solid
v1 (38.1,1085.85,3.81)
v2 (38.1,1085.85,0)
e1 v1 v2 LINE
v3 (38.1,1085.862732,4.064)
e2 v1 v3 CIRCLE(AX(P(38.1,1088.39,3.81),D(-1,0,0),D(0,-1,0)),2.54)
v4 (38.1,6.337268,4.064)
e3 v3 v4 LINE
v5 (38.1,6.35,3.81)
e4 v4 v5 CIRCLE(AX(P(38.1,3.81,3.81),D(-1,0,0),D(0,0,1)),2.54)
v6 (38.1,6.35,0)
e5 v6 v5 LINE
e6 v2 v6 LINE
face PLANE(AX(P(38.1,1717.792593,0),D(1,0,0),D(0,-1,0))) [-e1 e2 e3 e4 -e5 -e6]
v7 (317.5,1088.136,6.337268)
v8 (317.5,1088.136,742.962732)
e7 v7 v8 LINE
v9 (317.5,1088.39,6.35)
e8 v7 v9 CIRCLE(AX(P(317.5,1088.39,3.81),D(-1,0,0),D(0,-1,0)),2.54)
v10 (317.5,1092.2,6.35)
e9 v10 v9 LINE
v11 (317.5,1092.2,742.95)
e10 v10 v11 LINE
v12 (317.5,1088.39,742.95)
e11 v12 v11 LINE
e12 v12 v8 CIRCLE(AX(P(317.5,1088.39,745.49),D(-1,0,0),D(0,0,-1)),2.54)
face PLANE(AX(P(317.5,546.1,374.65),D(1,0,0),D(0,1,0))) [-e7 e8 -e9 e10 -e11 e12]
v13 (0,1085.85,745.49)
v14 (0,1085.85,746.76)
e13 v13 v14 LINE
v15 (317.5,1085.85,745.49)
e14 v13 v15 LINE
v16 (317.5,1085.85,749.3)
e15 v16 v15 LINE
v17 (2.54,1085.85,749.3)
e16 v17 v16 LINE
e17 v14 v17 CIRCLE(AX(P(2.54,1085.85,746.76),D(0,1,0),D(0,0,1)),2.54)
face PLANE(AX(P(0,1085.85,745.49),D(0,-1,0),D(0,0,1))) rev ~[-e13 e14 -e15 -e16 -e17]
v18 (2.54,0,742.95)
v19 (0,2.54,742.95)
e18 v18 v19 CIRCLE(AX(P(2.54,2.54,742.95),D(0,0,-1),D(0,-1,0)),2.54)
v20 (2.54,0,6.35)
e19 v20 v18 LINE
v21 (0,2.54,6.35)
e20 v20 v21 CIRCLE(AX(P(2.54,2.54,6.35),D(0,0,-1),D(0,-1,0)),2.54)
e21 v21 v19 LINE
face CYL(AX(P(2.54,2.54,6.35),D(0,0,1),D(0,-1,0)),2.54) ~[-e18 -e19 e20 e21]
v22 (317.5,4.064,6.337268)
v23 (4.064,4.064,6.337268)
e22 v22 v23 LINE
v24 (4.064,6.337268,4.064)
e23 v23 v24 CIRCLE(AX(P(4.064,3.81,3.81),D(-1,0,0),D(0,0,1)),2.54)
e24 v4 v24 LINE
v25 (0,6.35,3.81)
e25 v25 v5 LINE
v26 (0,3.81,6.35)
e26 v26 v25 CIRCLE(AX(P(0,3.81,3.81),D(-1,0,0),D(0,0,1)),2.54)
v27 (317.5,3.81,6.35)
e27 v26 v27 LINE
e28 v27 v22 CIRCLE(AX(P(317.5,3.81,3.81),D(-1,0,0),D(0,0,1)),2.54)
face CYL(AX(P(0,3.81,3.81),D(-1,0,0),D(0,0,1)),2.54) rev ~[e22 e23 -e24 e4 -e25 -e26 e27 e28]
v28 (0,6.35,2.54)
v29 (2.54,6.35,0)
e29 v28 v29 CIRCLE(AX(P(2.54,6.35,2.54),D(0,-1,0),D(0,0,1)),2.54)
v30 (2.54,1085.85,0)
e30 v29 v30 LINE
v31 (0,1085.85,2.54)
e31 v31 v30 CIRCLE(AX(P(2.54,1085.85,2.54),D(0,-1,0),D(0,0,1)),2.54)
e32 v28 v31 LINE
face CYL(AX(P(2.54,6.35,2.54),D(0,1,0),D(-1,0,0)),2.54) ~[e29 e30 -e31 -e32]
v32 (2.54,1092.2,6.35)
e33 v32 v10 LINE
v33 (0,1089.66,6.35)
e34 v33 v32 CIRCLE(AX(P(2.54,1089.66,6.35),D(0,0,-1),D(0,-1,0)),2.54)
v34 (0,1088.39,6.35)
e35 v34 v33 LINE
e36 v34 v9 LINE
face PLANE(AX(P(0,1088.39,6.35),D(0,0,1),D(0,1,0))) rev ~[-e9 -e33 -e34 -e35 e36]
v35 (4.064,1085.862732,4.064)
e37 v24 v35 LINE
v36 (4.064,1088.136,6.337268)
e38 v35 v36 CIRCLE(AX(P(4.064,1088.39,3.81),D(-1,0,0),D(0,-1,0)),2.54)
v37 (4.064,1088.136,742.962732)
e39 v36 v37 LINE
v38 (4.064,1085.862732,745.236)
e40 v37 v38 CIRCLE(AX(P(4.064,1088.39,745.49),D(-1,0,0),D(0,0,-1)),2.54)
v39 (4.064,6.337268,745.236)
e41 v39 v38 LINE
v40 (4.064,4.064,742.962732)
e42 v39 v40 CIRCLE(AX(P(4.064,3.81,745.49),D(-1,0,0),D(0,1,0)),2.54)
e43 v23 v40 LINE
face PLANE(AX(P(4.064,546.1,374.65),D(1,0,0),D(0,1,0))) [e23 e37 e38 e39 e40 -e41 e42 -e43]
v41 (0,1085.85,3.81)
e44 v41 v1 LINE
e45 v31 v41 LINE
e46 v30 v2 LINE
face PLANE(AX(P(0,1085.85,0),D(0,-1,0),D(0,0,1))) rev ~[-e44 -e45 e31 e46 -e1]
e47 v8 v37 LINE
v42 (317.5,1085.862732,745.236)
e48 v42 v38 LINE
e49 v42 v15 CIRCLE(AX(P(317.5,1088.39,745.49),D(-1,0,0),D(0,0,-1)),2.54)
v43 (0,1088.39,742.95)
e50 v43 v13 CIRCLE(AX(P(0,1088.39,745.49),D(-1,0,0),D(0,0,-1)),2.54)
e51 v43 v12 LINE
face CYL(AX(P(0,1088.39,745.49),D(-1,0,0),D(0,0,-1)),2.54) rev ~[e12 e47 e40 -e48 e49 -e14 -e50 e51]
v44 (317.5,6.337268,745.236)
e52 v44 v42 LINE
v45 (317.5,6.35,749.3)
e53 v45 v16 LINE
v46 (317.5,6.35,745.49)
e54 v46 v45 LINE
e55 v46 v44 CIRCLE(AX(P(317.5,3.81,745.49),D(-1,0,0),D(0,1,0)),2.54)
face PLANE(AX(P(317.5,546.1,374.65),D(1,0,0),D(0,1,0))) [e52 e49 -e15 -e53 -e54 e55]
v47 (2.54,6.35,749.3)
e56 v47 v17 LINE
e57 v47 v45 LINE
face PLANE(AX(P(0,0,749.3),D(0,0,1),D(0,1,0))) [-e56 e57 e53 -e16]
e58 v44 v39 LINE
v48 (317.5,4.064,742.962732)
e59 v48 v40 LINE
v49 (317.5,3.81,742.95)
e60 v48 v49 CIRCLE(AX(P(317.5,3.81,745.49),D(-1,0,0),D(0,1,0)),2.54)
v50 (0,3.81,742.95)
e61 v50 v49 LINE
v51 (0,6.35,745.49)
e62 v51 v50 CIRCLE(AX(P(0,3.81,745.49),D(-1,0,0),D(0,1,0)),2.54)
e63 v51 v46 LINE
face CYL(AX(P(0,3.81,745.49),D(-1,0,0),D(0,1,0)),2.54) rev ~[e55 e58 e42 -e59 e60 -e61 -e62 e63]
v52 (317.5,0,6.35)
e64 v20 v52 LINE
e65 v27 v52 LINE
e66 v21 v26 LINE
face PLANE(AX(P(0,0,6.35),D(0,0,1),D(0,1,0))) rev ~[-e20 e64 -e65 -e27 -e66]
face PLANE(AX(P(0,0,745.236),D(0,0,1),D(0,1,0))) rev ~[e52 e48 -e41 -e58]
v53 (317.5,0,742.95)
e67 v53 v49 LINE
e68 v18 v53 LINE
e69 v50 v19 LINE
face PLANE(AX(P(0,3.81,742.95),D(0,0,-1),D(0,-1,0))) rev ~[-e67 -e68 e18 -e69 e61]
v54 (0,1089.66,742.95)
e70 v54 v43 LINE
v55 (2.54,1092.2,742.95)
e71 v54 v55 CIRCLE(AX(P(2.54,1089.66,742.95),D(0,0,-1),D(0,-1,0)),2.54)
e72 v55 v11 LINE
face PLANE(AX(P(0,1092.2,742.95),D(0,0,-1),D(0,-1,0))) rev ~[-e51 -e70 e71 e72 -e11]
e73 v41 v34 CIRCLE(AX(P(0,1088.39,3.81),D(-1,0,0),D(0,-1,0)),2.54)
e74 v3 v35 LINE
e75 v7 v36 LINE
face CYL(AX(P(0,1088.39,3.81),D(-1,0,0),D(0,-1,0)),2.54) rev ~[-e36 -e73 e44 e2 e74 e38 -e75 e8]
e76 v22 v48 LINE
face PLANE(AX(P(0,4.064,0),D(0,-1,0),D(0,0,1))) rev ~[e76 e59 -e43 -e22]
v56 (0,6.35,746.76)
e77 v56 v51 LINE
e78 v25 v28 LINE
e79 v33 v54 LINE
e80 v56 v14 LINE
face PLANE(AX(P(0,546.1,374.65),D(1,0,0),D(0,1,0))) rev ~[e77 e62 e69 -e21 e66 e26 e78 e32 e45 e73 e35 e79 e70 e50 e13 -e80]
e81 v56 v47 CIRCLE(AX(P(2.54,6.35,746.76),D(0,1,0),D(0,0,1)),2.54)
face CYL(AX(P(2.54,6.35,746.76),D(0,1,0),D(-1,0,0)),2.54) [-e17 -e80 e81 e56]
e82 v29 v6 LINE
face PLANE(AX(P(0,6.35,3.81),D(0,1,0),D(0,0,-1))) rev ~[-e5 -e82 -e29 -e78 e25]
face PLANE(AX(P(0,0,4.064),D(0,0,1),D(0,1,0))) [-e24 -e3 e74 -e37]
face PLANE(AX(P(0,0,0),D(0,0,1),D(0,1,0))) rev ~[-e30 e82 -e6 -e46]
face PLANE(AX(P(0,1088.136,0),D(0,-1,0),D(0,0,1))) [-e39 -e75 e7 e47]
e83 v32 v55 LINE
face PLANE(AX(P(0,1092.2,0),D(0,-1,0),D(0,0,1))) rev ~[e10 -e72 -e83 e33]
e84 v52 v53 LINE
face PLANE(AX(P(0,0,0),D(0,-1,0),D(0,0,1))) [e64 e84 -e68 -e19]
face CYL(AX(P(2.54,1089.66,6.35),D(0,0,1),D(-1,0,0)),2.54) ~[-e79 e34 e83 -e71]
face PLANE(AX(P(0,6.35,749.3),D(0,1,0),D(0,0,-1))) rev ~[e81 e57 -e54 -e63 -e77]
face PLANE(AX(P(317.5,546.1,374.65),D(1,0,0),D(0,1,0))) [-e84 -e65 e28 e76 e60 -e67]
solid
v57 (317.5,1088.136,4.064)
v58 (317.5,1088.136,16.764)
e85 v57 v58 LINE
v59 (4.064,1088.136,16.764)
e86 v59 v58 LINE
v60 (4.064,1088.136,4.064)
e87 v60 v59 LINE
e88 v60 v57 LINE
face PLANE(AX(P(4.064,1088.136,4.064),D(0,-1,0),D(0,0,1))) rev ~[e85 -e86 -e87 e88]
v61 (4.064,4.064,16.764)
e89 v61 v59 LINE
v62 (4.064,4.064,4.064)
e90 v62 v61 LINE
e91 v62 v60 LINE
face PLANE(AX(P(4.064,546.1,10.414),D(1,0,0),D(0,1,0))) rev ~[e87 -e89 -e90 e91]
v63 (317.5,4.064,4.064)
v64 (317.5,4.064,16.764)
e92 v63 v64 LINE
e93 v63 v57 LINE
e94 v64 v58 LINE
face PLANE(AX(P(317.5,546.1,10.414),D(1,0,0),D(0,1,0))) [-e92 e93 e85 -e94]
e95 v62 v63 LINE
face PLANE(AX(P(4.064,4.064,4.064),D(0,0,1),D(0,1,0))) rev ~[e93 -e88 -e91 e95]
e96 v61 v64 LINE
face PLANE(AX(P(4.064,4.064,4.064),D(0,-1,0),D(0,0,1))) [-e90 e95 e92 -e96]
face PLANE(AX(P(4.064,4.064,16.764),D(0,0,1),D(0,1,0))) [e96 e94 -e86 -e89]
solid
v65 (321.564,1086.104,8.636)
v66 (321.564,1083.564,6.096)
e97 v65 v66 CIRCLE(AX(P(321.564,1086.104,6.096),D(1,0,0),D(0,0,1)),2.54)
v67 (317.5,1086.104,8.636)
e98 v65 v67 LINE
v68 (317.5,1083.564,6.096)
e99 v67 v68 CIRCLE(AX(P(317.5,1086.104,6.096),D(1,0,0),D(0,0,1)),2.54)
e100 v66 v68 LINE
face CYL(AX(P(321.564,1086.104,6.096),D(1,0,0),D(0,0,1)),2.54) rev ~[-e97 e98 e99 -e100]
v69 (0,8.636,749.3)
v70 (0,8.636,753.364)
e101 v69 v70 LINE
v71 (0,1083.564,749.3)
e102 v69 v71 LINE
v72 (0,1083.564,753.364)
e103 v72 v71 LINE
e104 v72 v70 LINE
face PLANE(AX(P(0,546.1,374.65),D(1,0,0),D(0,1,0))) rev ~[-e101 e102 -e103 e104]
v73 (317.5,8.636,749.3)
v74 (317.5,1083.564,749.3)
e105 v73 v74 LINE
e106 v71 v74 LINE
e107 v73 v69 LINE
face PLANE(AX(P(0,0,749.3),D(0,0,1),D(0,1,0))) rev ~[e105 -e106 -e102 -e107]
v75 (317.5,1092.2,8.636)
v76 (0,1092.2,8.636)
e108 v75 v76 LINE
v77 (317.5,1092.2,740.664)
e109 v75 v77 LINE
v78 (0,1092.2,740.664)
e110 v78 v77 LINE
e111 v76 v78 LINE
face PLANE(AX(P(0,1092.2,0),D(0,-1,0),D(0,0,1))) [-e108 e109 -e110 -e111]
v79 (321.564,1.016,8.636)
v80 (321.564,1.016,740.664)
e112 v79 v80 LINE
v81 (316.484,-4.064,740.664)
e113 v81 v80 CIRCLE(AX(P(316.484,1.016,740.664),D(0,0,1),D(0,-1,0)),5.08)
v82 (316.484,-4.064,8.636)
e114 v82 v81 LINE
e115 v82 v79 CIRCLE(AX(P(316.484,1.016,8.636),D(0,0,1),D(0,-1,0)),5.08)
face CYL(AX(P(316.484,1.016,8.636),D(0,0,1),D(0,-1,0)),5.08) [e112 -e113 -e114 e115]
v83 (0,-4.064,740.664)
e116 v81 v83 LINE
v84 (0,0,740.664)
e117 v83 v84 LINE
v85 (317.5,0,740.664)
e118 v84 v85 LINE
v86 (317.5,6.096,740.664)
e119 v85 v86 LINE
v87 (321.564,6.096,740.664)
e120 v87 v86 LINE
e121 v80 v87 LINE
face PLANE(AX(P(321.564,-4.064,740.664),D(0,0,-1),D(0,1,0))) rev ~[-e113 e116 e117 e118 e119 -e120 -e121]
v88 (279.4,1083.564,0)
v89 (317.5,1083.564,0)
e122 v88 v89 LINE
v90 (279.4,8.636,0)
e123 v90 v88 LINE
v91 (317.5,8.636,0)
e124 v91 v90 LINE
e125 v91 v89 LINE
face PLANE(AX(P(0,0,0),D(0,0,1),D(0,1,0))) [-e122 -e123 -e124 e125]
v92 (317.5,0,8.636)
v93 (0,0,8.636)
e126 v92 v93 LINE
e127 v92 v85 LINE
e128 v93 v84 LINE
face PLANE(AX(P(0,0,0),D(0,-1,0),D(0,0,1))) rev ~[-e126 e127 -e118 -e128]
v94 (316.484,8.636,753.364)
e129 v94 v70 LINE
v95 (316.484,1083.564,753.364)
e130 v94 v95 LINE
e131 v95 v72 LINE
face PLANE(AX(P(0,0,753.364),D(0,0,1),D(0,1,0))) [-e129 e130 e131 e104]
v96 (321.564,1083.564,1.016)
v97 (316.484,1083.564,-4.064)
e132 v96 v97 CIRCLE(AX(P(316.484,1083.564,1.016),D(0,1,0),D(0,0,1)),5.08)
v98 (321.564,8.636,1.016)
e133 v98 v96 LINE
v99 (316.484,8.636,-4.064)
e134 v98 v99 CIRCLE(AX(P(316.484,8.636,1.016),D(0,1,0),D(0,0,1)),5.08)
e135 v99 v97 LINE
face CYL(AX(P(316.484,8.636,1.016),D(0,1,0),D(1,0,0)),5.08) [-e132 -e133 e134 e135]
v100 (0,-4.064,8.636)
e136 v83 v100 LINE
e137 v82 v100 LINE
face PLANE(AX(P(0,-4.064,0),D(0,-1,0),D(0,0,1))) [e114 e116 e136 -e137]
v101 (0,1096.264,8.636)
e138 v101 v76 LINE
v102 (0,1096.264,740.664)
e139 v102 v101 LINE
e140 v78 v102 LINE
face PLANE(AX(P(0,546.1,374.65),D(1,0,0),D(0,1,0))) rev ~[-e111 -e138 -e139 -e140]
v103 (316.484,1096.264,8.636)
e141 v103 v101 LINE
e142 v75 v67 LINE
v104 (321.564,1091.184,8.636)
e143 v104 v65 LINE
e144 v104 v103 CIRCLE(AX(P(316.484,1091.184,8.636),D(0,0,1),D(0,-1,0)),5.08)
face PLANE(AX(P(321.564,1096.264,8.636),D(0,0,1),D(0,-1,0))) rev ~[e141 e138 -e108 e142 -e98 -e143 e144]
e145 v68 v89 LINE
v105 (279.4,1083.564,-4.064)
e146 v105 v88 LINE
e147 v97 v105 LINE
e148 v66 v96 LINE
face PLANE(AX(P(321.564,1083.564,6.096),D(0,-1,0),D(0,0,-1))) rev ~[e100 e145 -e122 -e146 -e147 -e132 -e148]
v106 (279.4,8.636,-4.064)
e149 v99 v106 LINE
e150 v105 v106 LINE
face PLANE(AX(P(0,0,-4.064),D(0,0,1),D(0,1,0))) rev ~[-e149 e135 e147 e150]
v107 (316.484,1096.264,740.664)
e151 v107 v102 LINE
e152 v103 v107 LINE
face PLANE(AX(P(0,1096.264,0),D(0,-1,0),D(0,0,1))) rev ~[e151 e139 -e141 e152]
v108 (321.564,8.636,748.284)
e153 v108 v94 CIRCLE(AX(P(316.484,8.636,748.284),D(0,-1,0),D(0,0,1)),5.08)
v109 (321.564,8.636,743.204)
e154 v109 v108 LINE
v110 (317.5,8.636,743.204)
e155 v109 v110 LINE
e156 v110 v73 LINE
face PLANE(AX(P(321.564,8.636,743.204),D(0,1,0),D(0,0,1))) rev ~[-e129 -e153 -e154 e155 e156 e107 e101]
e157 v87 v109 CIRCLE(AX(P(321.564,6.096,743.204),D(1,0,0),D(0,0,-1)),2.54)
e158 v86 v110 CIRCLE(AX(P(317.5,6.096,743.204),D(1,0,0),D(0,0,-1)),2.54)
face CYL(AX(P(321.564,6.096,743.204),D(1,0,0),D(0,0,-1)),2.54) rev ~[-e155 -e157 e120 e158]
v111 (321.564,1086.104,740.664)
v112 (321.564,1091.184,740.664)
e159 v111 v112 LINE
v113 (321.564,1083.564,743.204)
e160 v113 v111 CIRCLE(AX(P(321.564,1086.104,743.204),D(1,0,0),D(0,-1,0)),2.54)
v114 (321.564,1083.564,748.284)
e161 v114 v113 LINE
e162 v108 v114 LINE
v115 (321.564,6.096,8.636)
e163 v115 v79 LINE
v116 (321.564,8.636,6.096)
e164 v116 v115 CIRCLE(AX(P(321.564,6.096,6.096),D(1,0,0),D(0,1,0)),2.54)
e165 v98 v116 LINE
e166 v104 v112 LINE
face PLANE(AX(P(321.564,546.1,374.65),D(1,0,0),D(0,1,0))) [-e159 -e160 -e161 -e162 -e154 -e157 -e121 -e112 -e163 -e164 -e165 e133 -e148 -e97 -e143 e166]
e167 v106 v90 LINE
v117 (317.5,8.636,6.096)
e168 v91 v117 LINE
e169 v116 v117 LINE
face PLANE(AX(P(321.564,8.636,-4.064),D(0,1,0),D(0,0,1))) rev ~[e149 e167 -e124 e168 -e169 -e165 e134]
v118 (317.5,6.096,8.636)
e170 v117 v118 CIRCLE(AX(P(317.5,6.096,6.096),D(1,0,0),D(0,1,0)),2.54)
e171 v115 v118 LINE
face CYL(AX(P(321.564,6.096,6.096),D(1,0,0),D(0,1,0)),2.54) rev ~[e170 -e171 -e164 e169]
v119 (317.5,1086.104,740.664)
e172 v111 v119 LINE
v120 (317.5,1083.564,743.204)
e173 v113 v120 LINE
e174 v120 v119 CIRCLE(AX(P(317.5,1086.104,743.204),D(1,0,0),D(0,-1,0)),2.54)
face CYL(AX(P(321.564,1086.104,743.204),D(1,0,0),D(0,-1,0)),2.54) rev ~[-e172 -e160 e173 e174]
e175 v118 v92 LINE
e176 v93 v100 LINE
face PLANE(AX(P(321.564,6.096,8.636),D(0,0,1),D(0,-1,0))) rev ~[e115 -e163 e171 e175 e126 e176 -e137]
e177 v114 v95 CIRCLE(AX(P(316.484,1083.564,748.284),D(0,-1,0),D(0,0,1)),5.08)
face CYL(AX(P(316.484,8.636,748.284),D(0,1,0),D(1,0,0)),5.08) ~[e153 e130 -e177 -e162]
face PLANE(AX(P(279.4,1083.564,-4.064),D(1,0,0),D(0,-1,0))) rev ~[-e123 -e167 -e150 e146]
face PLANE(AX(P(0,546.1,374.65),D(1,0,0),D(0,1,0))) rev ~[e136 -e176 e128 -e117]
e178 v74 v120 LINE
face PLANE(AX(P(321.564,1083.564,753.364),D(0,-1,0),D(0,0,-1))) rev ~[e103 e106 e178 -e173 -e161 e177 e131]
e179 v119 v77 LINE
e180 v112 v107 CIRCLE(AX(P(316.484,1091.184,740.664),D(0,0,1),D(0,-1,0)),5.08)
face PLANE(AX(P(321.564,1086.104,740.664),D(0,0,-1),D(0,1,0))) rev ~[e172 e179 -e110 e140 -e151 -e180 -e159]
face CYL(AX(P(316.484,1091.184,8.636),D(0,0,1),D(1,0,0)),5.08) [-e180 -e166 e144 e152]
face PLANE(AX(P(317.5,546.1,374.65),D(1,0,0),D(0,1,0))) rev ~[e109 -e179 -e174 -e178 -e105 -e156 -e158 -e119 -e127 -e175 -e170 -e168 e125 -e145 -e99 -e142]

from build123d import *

# Parameters (mm, degrees)
F0_W      = 1092.2
F0_H      = 749.3
F1_DEPTH  = 317.5
F2_T      = -4.064
F3_W      = 279.4
F3_H      = 1717.7925925926
F4_DEPTH  = 4.064
F6_DEPTH  = 317.501
F7_R      = 2.54
F8_W      = 1084.072
F8_H      = 12.7
F9_DEPTH  = 313.436
F10_DEPTH = 317.5
F11_T     = 4.064
F13_DEPTH = 321.565
F14_R     = 5.08
F15_W     = 279.4
F15_H     = 1074.928
F16_DEPTH = 25.4


with BuildPart() as f1:
    # F0 (on Right) → F1 (new body)
    with BuildSketch(Plane.YZ):
        with Locations((546.1, 374.65)):
            Rectangle(F0_W, F0_H)
    extrude(amount=F1_DEPTH)

    # F2
    f2_openings = [f1.faces().sort_by_distance(p)[0] for p in [
        (317.5, 546.1, 374.65),
    ]]
    offset(amount=F2_T, openings=f2_openings)

    # F3 (on face) → F4 (cut)
    with BuildSketch(Plane(origin=(0, 0, 0), x_dir=(1, 0, 0), z_dir=(0, 0, -1))):
        with Locations((177.8, -858.8962962963)):
            Rectangle(F3_W, F3_H)
    extrude(amount=-F4_DEPTH, mode=Mode.SUBTRACT)

    # F5 (on face) → F6 (cut, through all)
    with BuildSketch(Plane(origin=(0, 0, 0), x_dir=(0, -1, 0), z_dir=(-1, 0, 0))):
        with BuildLine():
            Line((-1092.2, 6.35), (-1092.2, 0))
            Line((-1092.2, 0), (-1085.85, 0))
            Line((-1085.85, 0), (-1085.85, 3.81))
            ThreePointArc((-1085.85, 3.81), (-1086.5939487758, 5.6060512242), (-1088.39, 6.35))
            Line((-1088.39, 6.35), (-1092.2, 6.35))
        make_face()
        with BuildLine():
            Line((-1085.85, 749.3), (-1092.2, 749.3))
            Line((-1092.2, 749.3), (-1092.2, 742.95))
            Line((-1092.2, 742.95), (-1088.39, 742.95))
            ThreePointArc((-1088.39, 742.95), (-1086.5939487758, 743.6939487758), (-1085.85, 745.49))
            Line((-1085.85, 745.49), (-1085.85, 749.3))
        make_face()
        with BuildLine():
            Line((0, 742.95), (0, 749.3))
            Line((0, 749.3), (-6.35, 749.3))
            Line((-6.35, 749.3), (-6.35, 745.49))
            ThreePointArc((-6.35, 745.49), (-5.6060512242, 743.6939487758), (-3.81, 742.95))
            Line((-3.81, 742.95), (0, 742.95))
        make_face()
        with BuildLine():
            Line((-6.35, 0), (0, 0))
            Line((0, 0), (0, 6.35))
            Line((0, 6.35), (-3.81, 6.35))
            ThreePointArc((-3.81, 6.35), (-5.6060512242, 5.6060512242), (-6.35, 3.81))
            Line((-6.35, 3.81), (-6.35, 0))
        make_face()
    extrude(amount=-F6_DEPTH, mode=Mode.SUBTRACT)

    # F7
    f7_edges = [f1.edges().sort_by_distance(p)[0] for p in [
        (0, 1092.2, 374.65),
        (0, 546.1, 0),
        (0, 0, 374.65),
        (0, 546.1, 749.3),
    ]]
    fillet(f7_edges, radius=F7_R)


with BuildPart() as f9:
    # F8 (on face) → F9 (new body, through all)
    with BuildSketch(Plane.YZ.offset(4.064)):
        with Locations((546.1, 10.414)):
            Rectangle(F8_W, F8_H)
    extrude(amount=F9_DEPTH)


with BuildPart() as f10:
    # F0 (on Right) → F10 (new body)
    with BuildSketch(Plane.YZ):
        with Locations((546.1, 374.65)):
            Rectangle(F0_W, F0_H)
    extrude(amount=F10_DEPTH)

    # F11
    f11_openings = [f10.faces().sort_by_distance(p)[0] for p in [
        (0, 546.1, 374.65),
    ]]
    offset(amount=F11_T, openings=f11_openings, kind=Kind.INTERSECTION)

    # F12 (on face) → F13 (cut, through all)
    with BuildSketch(Plane.YZ.offset(321.564)):
        with BuildLine():
            Line((1083.564, -4.064), (1096.264, -4.064))
            Line((1096.264, -4.064), (1096.264, 8.636))
            Line((1096.264, 8.636), (1086.104, 8.636))
            ThreePointArc((1086.104, 8.636), (1084.3079487758, 7.8920512242), (1083.564, 6.096))
            Line((1083.564, 6.096), (1083.564, -4.064))
        make_face()
        with BuildLine():
            Line((8.636, 753.364), (-4.064, 753.364))
            Line((-4.064, 753.364), (-4.064, 740.664))
            Line((-4.064, 740.664), (6.096, 740.664))
            ThreePointArc((6.096, 740.664), (7.8920512242, 741.4079487758), (8.636, 743.204))
            Line((8.636, 743.204), (8.636, 753.364))
        make_face()
        with BuildLine():
            Line((1096.264, 740.664), (1096.264, 753.364))
            Line((1096.264, 753.364), (1083.564, 753.364))
            Line((1083.564, 753.364), (1083.564, 743.204))
            ThreePointArc((1083.564, 743.204), (1084.3079487758, 741.4079487758), (1086.104, 740.664))
            Line((1086.104, 740.664), (1096.264, 740.664))
        make_face()
        with BuildLine():
            Line((-4.064, 8.636), (-4.064, -4.064))
            Line((-4.064, -4.064), (8.636, -4.064))
            Line((8.636, -4.064), (8.636, 6.096))
            ThreePointArc((8.636, 6.096), (7.8920512242, 7.8920512242), (6.096, 8.636))
            Line((6.096, 8.636), (-4.064, 8.636))
        make_face()
    extrude(amount=-F13_DEPTH, mode=Mode.SUBTRACT)

    # F14
    f14_edges = [f10.edges().sort_by_distance(p)[0] for p in [
        (321.564, -4.064, 374.65),
        (321.564, 1096.264, 374.65),
        (321.564, 546.1, -4.064),
        (321.564, 546.1, 753.364),
    ]]
    fillet(f14_edges, radius=F14_R)

    # F15 (on face) → F16 (cut)
    with BuildSketch(Plane(origin=(0, 0, -4.064), x_dir=(1, 0, 0), z_dir=(0, 0, -1))):
        with Locations((139.7, -546.1)):
            Rectangle(F15_W, F15_H)
    extrude(amount=-F16_DEPTH, mode=Mode.SUBTRACT)


solid = Compound([f1.part, f9.part, f10.part])
